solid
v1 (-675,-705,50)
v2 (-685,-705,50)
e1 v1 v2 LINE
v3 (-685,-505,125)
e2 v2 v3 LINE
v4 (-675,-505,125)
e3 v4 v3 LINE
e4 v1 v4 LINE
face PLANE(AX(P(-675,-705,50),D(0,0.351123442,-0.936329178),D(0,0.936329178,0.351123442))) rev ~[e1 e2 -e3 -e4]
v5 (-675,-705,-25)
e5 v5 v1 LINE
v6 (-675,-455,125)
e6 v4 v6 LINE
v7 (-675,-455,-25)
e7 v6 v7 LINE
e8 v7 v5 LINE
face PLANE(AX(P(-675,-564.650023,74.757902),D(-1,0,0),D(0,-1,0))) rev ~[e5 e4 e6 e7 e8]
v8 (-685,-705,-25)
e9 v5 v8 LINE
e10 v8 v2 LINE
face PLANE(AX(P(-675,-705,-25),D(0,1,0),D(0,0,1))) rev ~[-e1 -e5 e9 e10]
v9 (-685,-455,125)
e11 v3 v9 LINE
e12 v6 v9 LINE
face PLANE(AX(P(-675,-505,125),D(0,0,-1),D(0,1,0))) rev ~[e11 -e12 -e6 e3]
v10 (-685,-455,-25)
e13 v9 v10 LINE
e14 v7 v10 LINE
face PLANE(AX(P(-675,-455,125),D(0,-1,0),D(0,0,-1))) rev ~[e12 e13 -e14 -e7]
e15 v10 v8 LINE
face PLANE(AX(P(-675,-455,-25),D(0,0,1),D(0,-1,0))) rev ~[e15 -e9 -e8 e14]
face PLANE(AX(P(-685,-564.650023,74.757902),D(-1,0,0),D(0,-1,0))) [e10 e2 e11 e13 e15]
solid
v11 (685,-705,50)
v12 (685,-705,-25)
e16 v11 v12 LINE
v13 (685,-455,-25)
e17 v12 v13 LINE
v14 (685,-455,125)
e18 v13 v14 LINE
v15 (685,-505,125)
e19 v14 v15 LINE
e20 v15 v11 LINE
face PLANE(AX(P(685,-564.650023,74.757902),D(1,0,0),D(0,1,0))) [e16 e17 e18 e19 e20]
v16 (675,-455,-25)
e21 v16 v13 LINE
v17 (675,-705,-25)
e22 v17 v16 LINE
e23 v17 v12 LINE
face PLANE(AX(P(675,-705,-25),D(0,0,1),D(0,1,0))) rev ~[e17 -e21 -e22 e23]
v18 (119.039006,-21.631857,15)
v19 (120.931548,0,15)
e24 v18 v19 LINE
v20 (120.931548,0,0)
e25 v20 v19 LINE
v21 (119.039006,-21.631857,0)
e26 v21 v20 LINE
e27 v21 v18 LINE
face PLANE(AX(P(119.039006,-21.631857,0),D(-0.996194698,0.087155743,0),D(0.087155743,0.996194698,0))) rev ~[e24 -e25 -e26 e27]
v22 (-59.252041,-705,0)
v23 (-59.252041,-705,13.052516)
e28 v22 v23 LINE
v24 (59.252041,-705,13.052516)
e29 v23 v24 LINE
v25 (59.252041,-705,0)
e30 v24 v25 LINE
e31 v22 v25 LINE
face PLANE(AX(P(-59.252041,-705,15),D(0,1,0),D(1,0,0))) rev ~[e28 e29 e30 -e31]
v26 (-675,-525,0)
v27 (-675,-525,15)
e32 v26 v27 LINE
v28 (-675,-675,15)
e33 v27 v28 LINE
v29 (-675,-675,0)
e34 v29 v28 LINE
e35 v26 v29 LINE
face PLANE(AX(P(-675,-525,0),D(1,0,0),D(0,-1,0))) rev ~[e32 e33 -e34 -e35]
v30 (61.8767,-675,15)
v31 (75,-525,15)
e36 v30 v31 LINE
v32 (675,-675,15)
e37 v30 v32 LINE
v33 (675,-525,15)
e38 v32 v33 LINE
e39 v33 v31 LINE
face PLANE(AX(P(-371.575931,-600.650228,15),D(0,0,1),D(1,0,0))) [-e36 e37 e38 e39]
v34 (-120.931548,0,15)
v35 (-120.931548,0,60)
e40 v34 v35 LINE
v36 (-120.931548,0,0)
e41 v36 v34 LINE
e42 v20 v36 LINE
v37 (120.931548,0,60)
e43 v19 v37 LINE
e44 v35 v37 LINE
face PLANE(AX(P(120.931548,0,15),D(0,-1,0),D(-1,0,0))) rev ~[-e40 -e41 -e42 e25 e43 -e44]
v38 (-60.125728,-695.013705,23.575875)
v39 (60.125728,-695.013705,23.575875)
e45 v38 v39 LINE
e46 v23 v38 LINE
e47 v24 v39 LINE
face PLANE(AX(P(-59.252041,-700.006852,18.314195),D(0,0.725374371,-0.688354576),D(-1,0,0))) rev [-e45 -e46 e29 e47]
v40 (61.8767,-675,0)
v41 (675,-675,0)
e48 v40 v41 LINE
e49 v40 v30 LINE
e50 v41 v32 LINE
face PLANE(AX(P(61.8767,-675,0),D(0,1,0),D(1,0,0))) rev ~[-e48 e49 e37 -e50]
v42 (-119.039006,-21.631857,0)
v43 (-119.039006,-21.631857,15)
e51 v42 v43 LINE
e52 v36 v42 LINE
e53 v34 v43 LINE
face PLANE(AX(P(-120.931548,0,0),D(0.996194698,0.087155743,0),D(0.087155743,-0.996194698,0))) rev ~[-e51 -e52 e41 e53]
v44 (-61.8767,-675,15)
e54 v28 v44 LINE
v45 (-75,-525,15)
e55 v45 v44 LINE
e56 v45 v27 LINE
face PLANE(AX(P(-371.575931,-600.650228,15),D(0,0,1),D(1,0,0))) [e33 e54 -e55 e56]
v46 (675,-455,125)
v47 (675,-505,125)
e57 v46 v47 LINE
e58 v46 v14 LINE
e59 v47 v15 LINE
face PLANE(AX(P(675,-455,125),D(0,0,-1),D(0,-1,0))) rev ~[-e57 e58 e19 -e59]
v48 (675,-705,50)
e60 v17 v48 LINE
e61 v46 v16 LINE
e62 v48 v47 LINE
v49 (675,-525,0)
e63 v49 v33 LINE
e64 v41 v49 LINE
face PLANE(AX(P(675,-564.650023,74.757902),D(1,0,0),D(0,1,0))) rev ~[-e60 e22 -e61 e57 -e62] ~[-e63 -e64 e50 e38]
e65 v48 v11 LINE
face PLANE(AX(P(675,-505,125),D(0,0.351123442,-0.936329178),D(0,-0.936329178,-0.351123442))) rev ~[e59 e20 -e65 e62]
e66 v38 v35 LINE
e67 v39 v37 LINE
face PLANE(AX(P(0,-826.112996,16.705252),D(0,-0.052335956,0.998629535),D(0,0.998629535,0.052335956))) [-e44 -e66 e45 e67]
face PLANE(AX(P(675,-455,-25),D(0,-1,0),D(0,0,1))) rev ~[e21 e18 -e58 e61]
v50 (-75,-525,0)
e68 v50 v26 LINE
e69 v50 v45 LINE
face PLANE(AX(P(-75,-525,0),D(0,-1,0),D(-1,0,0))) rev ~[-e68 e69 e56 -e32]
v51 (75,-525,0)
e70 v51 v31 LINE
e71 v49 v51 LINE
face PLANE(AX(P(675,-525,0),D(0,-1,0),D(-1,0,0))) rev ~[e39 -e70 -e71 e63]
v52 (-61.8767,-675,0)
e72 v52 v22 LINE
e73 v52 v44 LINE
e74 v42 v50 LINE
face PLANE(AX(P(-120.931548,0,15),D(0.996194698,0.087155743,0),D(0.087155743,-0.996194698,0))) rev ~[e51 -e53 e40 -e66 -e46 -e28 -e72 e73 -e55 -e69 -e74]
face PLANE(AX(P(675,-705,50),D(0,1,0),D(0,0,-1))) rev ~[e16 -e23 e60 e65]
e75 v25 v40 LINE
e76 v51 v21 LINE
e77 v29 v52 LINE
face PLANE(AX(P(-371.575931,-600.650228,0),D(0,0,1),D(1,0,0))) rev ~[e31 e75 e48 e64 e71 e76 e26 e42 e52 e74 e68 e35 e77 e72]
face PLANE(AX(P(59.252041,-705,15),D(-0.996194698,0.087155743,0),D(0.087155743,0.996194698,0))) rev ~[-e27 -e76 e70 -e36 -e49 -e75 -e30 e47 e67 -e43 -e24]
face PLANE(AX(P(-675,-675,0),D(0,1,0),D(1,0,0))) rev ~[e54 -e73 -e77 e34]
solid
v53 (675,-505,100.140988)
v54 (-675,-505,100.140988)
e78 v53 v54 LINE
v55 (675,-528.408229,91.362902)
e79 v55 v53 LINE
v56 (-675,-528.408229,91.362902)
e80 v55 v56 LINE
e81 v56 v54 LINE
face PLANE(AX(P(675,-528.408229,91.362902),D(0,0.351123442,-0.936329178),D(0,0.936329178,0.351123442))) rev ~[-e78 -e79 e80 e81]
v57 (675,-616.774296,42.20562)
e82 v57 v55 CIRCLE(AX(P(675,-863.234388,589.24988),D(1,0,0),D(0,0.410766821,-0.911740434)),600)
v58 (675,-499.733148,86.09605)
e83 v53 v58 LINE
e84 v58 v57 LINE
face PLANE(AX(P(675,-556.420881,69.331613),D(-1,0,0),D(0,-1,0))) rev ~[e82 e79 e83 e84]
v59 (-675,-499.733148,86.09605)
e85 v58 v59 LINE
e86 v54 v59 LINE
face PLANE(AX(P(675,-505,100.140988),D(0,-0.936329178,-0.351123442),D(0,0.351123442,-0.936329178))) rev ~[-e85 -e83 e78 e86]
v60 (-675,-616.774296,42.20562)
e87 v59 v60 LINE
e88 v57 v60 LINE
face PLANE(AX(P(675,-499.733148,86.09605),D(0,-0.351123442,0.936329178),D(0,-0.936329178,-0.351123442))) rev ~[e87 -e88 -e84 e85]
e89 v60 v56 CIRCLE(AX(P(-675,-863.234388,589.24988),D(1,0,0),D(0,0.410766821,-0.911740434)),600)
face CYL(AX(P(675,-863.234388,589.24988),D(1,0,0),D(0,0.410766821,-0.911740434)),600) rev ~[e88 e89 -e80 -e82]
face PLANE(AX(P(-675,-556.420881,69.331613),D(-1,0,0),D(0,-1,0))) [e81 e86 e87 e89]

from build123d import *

# Parameters (mm, degrees)
F1_DEPTH       = 15
F2_W           = 150
F2_H           = 15
F3_DEPTH       = 10
F4_W           = 250
F4_H           = 75
F4_W_2         = 150
F4_H_2         = 15
F5_DEPTH       = 10
F7_DEPTH       = 45
F9_DEPTH       = 1350
F11_DEPTH      = 675
F11_DEPTH_BACK = 675
F12_SIZE       = 10


# Not quite as in the source:
# - an extrude ends at something that could not be found from the text; its depth is read off the source's solid


with BuildPart() as f1:
    # F0 (on Top) → F1 (new body)
    with BuildSketch(Plane.XY):
        Polygon((-61.8767004711, -675), (-75, -525), (-675, -525), (-675, -675), align=None)
        Polygon((0, -525), (0, 0), (-120.9315483511, 0), (-119.0390060495, -21.6318574922), (-75, -525), align=None)
        Polygon((120.9315483511, 0), (0, 0), (0, -525), (75, -525), (119.0390060495, -21.6318574922), align=None)
        Polygon((0, -705), (0, -525), (-75, -525), (-61.8767004711, -675), (-59.2520405653, -705), align=None)
        Polygon((75, -525), (0, -525), (0, -705), (59.2520405653, -705), (61.8767004711, -675), align=None)
        Polygon((675, -525), (75, -525), (61.8767004711, -675), (675, -675), align=None)
    extrude(amount=F1_DEPTH)

    # F2 (on face) → F3 (join)
    with BuildSketch(Plane.YZ.offset(675)):
        Polygon((-505, 125), (-705, 50), (-455, 50), (-455, 125), align=None)
        Polygon((-705, 50), (-705, 0), (-705, -25), (-455, -25), (-455, 50), align=None)
        with Locations((-600, 7.5)):
            Rectangle(F2_W, F2_H, mode=Mode.SUBTRACT)
        with Locations((-600, 7.5)):
            Rectangle(F2_W, F2_H)
    extrude(amount=F3_DEPTH)

    # F6 (on face) → F7 (join)
    with BuildSketch(Plane.XY.offset(15)):
        Polygon((120.9315483511, 0), (-120.9315483511, 0), (-59.2520405653, -705), (59.2520405653, -705), align=None)
    extrude(amount=F7_DEPTH)

    # F10 (on Right) → F11 (cut, two sides)
    with BuildSketch(Plane.YZ) as f11_sk:
        Polygon((-826.1129958937, 16.7052524484), (0, 60), (-829.8766534977, 88.5201176353), align=None)
    extrude(amount=F11_DEPTH, mode=Mode.SUBTRACT)
    extrude(f11_sk.sketch, amount=-F11_DEPTH_BACK, mode=Mode.SUBTRACT)

    # F12
    f12_edges = [f1.edges().sort_by_distance(p)[0] for p in [
        (0, -705, 23.052516),
    ]]
    chamfer(f12_edges, length=F12_SIZE)


with BuildPart() as f5:
    # F4 (on face) → F5 (new body)
    with BuildSketch(Plane(origin=(-675, 0, 0), x_dir=(0, -1, 0), z_dir=(-1, 0, 0))):
        Polygon((455, 125), (455, 50), (705, 50), (505, 125), align=None)
        with Locations((580, 12.5)):
            Rectangle(F4_W, F4_H)
        with Locations((600, 7.5)):
            Rectangle(F4_W_2, F4_H_2, mode=Mode.SUBTRACT)
        with Locations((600, 7.5)):
            Rectangle(F4_W_2, F4_H_2)
    extrude(amount=F5_DEPTH)


with BuildPart() as f9:
    # F8 (on face) → F9 (new body, through all)
    with BuildSketch(Plane(origin=(675, 0, 0), x_dir=(0, -1, 0), z_dir=(-1, 0, 0))):
        with BuildLine():
            Line((528.4082294392, 91.3629019553), (505, 100.140987995))
            Line((505, 100.140987995), (499.7331483762, 86.0960503315))
            Line((499.7331483762, 86.0960503315), (616.7742955723, 42.2056201329))
            ThreePointArc((616.7742955723, 42.2056201329), (571.5538504506, 64.9193893734), (528.4082294392, 91.3629019553))
        make_face()
    extrude(amount=F9_DEPTH)


solid = Compound([f1.part, f5.part, f9.part])
